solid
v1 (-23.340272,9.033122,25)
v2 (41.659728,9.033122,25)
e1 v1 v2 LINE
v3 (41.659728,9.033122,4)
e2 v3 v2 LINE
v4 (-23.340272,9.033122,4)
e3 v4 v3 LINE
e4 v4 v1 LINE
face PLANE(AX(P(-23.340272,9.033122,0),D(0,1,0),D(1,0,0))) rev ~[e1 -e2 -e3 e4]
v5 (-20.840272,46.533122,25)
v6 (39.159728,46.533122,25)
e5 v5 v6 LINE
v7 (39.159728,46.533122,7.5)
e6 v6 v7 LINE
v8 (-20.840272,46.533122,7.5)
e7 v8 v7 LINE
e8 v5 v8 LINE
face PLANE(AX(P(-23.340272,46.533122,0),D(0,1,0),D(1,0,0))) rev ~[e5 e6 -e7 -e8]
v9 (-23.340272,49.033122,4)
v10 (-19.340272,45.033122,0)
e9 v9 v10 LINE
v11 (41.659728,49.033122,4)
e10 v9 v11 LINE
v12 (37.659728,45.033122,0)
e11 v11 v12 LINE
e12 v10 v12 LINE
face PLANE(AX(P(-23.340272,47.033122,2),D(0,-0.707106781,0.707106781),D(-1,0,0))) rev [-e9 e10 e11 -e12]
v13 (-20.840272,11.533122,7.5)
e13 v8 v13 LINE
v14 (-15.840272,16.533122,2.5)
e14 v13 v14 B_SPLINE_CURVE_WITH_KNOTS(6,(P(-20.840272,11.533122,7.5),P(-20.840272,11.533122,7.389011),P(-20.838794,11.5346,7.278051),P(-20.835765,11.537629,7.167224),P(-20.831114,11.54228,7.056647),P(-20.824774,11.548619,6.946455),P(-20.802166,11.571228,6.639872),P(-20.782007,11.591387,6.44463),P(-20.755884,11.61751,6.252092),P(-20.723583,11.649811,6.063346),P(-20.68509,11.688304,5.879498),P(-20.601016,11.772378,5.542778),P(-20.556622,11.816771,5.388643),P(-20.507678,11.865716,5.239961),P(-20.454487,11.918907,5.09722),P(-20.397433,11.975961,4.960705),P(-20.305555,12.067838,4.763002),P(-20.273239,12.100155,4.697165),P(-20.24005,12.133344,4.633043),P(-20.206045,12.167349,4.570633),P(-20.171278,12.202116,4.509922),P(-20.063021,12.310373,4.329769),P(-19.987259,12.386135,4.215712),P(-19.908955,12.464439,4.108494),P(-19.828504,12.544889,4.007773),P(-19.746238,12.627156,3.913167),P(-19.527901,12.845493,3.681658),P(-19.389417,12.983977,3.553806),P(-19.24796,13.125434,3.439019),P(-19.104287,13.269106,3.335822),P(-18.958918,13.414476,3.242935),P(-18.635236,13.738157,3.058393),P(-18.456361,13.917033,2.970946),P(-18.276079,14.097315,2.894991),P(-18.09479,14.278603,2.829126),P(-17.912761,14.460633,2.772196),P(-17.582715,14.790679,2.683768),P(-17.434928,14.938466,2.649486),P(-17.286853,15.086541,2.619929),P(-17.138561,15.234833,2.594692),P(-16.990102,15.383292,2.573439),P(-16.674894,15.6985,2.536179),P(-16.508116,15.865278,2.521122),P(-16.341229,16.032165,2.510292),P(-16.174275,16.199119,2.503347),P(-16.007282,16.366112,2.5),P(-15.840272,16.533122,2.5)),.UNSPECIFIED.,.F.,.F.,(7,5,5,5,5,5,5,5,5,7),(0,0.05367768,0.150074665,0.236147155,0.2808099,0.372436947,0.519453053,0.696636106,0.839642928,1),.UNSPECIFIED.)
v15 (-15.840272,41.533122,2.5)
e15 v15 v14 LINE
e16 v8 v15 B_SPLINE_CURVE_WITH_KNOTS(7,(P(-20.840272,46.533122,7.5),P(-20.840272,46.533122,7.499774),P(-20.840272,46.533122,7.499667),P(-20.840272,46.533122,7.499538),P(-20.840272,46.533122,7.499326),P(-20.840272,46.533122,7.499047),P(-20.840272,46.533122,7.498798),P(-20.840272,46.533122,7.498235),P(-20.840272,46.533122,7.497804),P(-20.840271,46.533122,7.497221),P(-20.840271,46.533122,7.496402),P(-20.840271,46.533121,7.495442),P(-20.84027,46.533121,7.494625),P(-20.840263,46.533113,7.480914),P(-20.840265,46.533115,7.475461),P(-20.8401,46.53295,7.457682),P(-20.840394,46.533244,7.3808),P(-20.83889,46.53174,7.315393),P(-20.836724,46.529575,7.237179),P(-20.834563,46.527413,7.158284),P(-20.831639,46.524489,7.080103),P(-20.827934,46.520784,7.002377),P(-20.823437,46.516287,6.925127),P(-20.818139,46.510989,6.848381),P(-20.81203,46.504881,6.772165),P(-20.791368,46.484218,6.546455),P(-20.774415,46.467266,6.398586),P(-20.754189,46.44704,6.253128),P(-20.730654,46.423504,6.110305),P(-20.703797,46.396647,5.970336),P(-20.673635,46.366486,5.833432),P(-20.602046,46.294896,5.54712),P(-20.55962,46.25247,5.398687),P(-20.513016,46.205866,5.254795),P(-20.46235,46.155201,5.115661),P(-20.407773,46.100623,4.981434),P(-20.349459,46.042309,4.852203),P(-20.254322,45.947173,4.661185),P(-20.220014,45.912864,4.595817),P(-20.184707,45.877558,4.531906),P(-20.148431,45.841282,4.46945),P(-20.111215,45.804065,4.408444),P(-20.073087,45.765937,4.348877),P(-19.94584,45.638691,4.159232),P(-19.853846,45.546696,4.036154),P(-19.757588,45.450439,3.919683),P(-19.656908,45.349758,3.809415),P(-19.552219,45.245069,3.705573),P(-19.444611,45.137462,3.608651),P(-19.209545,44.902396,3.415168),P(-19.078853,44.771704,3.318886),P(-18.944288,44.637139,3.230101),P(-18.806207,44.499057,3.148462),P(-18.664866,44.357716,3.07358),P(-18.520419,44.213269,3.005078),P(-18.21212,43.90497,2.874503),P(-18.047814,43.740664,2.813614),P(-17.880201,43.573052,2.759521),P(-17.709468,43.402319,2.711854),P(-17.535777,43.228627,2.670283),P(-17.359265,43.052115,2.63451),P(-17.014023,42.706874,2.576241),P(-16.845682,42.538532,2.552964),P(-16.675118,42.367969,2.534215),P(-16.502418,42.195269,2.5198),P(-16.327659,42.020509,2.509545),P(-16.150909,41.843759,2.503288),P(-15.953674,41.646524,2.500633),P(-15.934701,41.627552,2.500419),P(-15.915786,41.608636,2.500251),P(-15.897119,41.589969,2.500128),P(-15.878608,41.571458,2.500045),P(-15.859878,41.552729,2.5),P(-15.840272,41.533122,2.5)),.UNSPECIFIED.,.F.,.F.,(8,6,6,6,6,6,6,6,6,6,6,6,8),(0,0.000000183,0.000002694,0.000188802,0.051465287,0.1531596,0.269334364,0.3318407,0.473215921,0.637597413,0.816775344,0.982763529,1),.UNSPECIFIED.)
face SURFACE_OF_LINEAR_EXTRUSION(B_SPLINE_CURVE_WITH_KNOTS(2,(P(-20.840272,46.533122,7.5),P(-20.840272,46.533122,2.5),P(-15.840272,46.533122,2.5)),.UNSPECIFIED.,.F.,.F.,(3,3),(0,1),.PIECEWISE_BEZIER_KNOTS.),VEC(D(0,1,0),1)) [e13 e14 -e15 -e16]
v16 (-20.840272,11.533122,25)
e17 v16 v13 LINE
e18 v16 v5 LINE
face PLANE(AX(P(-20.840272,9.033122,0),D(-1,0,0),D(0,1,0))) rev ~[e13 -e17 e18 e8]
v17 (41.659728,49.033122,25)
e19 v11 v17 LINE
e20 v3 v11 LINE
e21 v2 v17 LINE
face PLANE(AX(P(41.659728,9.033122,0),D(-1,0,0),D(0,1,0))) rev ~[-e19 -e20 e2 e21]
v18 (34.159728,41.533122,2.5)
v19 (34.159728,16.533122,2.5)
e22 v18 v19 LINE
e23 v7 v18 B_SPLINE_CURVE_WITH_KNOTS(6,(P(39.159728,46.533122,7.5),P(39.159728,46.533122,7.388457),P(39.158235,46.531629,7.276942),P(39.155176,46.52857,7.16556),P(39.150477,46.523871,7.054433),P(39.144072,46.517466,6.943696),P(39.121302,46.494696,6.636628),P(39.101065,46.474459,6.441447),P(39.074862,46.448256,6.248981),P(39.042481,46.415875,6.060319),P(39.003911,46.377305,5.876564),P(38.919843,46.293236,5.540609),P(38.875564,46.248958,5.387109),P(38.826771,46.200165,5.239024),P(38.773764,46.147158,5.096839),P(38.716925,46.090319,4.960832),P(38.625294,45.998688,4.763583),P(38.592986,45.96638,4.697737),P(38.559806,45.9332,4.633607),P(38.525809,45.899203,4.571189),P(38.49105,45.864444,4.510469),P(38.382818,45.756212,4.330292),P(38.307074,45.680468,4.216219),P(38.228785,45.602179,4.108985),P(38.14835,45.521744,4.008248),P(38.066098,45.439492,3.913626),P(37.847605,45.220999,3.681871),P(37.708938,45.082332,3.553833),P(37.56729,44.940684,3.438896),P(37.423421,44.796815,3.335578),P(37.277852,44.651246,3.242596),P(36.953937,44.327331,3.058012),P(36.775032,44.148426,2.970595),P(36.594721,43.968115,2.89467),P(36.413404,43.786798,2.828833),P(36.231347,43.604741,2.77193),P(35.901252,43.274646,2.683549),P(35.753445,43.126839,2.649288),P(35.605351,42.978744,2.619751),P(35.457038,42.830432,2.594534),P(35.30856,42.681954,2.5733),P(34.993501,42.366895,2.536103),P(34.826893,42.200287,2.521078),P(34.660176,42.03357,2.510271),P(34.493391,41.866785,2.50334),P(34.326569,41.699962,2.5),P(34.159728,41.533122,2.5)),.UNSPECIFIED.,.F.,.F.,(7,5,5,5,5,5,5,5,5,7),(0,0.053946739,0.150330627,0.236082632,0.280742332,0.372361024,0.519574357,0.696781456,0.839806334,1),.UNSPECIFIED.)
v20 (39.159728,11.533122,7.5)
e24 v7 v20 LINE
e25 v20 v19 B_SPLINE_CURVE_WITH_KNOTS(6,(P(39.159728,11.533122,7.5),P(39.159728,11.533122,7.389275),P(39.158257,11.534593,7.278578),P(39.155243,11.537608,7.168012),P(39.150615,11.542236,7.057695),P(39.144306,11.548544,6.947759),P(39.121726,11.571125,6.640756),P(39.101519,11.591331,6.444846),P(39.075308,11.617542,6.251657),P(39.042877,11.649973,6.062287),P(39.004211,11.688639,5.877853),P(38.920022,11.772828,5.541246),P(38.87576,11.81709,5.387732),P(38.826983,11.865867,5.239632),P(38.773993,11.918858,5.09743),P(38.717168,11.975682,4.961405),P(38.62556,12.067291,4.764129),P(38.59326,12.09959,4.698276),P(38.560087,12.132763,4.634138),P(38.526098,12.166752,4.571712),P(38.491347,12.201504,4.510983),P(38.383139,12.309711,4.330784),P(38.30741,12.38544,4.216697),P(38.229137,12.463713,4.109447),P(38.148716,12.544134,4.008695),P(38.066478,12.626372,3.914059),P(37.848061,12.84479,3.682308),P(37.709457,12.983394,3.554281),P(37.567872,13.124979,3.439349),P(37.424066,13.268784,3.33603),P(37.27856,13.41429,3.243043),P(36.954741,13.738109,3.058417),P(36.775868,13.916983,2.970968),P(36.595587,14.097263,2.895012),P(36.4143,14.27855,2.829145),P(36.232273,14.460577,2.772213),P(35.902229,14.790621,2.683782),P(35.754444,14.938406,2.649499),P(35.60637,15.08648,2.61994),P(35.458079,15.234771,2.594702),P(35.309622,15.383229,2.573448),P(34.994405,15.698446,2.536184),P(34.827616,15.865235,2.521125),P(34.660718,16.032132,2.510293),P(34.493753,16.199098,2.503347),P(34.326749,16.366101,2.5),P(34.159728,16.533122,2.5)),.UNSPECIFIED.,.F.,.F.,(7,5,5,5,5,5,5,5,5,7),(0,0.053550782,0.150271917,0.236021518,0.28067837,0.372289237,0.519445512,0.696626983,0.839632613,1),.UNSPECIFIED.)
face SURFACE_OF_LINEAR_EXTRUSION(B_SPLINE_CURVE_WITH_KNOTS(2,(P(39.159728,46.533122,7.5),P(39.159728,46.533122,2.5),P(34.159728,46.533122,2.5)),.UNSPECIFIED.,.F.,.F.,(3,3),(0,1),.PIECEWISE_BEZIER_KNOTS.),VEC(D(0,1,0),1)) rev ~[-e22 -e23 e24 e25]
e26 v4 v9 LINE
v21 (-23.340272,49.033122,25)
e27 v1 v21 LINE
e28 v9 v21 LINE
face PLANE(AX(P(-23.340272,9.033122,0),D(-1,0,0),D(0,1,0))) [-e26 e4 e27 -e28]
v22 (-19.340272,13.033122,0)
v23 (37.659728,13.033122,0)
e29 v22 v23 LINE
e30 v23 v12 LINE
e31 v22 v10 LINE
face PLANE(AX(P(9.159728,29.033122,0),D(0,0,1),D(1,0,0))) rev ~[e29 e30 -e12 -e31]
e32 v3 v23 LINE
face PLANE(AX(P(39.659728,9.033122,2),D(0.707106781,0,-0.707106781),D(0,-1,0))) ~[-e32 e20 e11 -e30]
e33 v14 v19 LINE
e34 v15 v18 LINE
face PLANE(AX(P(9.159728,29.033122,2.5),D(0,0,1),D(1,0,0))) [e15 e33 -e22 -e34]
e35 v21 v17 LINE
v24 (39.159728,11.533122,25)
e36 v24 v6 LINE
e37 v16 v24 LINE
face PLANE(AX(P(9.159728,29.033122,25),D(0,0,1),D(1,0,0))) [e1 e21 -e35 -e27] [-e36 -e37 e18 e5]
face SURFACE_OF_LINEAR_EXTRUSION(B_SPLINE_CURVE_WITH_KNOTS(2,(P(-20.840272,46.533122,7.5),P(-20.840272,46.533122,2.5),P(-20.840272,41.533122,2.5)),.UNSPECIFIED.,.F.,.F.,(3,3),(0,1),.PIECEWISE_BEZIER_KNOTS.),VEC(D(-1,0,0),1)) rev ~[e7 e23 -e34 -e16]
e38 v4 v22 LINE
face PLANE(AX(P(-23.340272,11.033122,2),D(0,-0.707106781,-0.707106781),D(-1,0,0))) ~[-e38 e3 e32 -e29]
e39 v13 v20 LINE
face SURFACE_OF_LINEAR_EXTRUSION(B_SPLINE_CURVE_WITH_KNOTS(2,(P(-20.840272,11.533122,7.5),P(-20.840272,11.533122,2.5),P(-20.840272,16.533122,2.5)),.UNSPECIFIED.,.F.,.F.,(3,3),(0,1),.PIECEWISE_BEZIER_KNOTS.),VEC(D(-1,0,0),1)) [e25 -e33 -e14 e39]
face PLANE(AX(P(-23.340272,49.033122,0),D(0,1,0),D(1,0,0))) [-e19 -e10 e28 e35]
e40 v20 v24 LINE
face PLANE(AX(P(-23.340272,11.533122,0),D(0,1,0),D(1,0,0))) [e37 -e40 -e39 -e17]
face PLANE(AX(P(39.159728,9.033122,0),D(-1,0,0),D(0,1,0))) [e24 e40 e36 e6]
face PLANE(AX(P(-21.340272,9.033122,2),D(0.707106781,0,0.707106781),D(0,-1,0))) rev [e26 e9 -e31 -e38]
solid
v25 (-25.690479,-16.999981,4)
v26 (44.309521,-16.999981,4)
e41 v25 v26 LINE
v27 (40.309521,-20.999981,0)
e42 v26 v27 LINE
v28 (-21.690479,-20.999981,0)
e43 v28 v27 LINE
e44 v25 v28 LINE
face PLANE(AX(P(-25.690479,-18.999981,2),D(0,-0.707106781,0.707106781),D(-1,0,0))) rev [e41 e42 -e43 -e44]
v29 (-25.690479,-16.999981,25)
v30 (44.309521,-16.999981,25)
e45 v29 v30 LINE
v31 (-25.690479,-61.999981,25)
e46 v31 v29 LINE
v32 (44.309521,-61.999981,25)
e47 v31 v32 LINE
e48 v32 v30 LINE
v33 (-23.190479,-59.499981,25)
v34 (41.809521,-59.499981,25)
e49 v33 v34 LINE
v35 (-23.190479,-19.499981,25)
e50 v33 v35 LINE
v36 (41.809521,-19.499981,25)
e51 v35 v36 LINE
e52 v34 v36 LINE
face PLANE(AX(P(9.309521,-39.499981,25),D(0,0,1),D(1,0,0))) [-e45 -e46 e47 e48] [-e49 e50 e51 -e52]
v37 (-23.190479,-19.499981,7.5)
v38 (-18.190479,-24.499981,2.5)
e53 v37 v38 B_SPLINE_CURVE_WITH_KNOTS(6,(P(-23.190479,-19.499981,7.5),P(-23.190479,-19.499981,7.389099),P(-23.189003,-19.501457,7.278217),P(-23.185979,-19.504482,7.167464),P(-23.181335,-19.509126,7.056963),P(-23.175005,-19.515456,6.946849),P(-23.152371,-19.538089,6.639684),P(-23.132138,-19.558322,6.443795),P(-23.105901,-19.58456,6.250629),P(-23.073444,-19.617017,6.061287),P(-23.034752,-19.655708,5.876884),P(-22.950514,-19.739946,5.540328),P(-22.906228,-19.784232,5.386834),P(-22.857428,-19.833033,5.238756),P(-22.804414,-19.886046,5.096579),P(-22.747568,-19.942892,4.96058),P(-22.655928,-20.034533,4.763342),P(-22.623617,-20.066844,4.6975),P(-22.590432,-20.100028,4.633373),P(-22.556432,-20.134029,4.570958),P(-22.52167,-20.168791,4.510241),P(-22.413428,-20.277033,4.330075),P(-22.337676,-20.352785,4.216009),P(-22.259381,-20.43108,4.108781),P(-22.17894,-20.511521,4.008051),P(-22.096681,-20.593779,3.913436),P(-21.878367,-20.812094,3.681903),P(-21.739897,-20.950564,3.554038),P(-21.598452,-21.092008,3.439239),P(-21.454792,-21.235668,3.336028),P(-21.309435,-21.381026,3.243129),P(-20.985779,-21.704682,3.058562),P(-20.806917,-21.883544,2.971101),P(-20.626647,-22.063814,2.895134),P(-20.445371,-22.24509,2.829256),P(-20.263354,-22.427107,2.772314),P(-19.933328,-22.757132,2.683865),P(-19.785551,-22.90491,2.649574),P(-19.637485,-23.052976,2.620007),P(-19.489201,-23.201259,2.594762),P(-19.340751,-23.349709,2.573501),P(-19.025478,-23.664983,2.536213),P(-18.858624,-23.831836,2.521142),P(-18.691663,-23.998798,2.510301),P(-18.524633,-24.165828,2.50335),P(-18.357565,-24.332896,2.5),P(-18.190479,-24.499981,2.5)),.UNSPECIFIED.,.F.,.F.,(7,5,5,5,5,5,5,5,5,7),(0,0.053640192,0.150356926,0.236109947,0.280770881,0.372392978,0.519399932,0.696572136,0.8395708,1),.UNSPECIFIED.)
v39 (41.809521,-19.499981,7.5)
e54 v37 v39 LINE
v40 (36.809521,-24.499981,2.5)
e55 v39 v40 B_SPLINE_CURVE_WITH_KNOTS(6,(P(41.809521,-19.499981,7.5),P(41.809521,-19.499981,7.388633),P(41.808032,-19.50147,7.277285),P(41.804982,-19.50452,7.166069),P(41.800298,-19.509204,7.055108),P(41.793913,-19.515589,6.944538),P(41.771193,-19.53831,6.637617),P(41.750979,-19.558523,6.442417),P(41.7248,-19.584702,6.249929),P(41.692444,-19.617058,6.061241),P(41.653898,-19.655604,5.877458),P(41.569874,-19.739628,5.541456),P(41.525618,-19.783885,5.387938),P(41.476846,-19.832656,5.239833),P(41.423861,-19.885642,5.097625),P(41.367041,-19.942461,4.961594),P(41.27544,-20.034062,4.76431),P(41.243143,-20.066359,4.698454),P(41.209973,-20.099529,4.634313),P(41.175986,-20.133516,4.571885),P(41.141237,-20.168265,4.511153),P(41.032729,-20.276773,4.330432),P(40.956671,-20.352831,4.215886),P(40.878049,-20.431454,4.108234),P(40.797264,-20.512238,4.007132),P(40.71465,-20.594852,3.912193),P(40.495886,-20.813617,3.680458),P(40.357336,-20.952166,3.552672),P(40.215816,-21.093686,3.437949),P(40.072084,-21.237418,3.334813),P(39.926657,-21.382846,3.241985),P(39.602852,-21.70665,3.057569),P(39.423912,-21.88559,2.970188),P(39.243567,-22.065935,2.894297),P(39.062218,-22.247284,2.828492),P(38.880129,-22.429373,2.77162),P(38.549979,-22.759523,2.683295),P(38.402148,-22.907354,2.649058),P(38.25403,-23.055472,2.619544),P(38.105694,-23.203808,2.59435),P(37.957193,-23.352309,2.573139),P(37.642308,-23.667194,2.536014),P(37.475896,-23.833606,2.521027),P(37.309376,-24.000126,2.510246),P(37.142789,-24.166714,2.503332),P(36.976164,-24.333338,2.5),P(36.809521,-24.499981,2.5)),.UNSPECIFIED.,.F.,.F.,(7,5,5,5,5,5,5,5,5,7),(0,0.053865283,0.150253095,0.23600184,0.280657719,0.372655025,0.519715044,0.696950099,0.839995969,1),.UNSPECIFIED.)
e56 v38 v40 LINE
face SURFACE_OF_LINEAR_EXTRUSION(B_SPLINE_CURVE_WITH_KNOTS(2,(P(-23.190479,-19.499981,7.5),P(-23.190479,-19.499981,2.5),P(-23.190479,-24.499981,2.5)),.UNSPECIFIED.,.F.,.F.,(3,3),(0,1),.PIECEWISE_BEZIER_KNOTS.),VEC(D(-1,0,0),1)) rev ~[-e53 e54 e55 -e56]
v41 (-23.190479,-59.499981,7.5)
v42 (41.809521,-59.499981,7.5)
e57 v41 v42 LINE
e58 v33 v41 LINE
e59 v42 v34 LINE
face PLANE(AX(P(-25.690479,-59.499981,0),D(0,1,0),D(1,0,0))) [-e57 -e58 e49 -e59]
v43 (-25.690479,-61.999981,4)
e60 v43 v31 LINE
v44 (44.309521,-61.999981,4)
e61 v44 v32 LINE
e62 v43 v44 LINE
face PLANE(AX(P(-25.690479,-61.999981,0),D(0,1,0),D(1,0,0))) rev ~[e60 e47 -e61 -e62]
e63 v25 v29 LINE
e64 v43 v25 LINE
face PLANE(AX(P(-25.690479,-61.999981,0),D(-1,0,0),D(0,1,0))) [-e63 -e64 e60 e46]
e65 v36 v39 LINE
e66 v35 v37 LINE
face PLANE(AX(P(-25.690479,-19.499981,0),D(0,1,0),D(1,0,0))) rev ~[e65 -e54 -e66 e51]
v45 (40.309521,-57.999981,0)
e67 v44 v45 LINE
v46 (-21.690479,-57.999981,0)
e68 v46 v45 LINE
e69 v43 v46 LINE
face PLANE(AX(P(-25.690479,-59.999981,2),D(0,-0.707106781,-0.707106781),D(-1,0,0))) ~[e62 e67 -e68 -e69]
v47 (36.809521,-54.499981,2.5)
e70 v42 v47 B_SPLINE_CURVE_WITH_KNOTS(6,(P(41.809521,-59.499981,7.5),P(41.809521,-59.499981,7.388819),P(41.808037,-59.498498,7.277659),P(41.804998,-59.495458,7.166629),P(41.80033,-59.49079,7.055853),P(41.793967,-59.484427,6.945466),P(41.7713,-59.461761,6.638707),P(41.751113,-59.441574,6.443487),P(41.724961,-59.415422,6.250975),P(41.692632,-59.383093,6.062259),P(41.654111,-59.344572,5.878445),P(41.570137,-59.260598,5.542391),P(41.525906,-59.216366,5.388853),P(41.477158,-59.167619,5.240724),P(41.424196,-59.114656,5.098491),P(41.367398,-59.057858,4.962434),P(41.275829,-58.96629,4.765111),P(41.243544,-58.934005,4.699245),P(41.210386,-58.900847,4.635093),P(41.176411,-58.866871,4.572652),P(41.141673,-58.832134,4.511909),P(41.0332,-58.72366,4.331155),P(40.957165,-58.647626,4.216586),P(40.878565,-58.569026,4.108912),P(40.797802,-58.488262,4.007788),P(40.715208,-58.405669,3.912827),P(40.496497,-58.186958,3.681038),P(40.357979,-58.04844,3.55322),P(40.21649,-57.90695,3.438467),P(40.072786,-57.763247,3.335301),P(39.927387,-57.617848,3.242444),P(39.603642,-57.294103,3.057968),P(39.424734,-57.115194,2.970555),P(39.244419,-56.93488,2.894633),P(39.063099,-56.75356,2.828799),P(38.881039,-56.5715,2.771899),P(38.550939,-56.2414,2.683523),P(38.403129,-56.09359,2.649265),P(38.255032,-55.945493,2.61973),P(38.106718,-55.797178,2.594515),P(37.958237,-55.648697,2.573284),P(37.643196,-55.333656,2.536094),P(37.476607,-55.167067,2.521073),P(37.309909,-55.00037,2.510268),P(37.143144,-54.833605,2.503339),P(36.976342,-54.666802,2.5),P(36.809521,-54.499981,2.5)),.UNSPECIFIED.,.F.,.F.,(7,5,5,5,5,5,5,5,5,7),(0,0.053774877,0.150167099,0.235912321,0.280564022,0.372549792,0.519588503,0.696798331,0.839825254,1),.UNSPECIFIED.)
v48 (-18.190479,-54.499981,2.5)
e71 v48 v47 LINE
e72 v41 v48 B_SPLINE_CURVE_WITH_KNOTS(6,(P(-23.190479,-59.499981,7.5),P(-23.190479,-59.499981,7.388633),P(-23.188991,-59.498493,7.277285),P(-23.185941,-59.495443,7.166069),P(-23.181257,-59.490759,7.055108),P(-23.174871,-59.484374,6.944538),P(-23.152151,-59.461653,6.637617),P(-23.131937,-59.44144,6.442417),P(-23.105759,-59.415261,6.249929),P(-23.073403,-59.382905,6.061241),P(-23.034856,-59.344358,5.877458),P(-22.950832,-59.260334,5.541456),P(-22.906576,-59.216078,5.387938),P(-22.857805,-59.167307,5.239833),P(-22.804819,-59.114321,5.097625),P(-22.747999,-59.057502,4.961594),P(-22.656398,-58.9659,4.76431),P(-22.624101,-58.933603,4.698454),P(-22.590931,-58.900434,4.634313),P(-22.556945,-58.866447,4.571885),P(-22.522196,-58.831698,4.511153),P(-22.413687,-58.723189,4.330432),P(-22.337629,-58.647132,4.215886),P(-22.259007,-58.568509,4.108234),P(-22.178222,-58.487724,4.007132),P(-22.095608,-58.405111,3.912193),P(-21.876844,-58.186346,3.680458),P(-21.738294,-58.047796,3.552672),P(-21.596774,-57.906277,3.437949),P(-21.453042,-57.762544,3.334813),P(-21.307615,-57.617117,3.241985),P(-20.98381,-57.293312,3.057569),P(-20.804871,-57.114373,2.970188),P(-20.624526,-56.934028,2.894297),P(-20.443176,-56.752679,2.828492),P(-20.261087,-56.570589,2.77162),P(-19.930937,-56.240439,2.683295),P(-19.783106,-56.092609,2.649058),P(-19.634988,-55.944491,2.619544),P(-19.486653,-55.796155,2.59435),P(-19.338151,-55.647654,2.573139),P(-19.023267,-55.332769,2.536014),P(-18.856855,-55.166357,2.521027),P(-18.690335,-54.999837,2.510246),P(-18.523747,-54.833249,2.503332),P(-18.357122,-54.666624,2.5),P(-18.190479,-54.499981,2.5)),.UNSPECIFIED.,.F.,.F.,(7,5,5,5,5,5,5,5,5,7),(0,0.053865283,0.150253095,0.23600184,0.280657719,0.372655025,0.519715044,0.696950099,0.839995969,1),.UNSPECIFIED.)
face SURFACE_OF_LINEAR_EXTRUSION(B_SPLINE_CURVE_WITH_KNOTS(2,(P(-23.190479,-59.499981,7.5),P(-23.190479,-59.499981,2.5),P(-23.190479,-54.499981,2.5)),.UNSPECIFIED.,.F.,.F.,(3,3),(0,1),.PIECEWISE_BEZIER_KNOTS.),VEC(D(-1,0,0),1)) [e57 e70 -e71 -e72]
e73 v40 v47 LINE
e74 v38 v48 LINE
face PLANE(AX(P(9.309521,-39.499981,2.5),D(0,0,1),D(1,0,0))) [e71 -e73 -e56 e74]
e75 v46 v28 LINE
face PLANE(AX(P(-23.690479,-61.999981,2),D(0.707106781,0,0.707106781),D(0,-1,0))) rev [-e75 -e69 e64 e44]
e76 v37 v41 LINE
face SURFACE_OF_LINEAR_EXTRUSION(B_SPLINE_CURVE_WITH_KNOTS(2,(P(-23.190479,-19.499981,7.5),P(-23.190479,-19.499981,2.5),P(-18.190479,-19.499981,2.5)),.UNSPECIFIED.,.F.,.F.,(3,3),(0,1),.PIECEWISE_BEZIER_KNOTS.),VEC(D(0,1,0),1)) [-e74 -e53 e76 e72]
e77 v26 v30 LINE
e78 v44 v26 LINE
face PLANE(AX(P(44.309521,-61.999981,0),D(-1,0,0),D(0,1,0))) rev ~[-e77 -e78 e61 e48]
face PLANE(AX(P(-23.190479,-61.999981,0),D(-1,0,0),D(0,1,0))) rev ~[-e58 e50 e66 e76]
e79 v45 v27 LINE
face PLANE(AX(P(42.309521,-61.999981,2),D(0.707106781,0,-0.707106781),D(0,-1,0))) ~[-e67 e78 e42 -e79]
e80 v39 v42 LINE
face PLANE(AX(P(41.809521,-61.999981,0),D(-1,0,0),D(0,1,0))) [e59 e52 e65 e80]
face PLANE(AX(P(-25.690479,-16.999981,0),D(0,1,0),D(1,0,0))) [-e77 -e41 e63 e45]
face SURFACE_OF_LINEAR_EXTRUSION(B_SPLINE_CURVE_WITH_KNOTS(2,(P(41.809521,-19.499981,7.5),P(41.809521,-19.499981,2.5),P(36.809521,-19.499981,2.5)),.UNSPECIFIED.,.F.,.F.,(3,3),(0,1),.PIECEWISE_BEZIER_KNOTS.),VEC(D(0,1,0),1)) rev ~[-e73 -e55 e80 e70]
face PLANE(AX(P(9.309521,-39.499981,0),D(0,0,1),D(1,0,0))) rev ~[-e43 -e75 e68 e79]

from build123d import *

# Parameters (mm, degrees)
F0_W        = 70
F0_H        = 45
F1_DEPTH    = 25
F2_T        = -2.5
F3_T1_DEPTH = 40
F3_T3_DEPTH = 65
F4_SIZE     = 4
F5_W        = 65
F5_H        = 40
F6_DEPTH    = 25
F7_T        = -2.5
F8_T1_DEPTH = 35
F8_T3_DEPTH = 60
F9_SIZE     = 4


# Not quite as in the source:
# - a fillet or chamfer that OpenCascade refuses, or shapes differently, is made with other operations: its cross-section is extruded or revolved along the edge and cut away or added


with BuildPart() as f1:
    # F0 (on Top) → F1 (new body)
    with BuildSketch(Plane.XY):
        with Locations((9.3095207959, -39.4999814034)):
            Rectangle(F0_W, F0_H)
    extrude(amount=F1_DEPTH)

    # F2
    f2_openings = [f1.faces().sort_by_distance(p)[0] for p in [
        (9.309521, -39.499981, 25),
    ]]
    offset(amount=F2_T, openings=f2_openings)

    # F3: fillet of radius 5 on 4 edges, made by hand

    # F3_s2 → F3_t1 (join)
    with BuildSketch(Plane.XZ.offset(19.4999814034)):
        with BuildLine():
            add(Edge.make_bspline(
                [(-23.1904792041, 7.5), (-23.1904792041, 2.5), (-18.1904792041, 2.5)],
                knots=[0, 0, 0, 1, 1, 1], degree=2, weights=[1, 1, 1]))
            Line((-18.1904792041, 2.5), (-23.1904792041, 2.5))
            Line((-23.1904792041, 2.5), (-23.1904792041, 7.5))
        make_face()
        with BuildLine():
            add(Edge.make_bspline(
                [(41.8095207959, 7.5), (41.8095207959, 2.5), (36.8095207959, 2.5)],
                knots=[0, 0, 0, 1, 1, 1], degree=2, weights=[1, 1, 1]))
            Line((36.8095207959, 2.5), (41.8095207959, 2.5))
            Line((41.8095207959, 2.5), (41.8095207959, 7.5))
        make_face()
    extrude(amount=F3_T1_DEPTH)

    # F3_s4 → F3_t3 (join)
    with BuildSketch(Plane.YZ.offset(-23.1904792041)):
        with BuildLine():
            add(Edge.make_bspline(
                [(-19.4999814034, 7.5), (-19.4999814034, 2.5), (-24.4999814034, 2.5)],
                knots=[0, 0, 0, 1, 1, 1], degree=2, weights=[1, 1, 1]))
            Line((-24.4999814034, 2.5), (-19.4999814034, 2.5))
            Line((-19.4999814034, 2.5), (-19.4999814034, 7.5))
        make_face()
        with BuildLine():
            add(Edge.make_bspline(
                [(-59.4999814034, 7.5), (-59.4999814034, 2.5), (-54.4999814034, 2.5)],
                knots=[0, 0, 0, 1, 1, 1], degree=2, weights=[1, 1, 1]))
            Line((-54.4999814034, 2.5), (-59.4999814034, 2.5))
            Line((-59.4999814034, 2.5), (-59.4999814034, 7.5))
        make_face()
    extrude(amount=F3_T3_DEPTH)

    # F4
    f4_edges = [f1.edges().sort_by_distance(p)[0] for p in [
        (9.309521, -61.999981, 0),
        (-25.690479, -39.499981, 0),
        (44.309521, -39.499981, 0),
        (9.309521, -16.999981, 0),
    ]]
    chamfer(f4_edges, length=F4_SIZE)


with BuildPart() as f6:
    # F5 (on Top) → F6 (new body)
    with BuildSketch(Plane.XY):
        with Locations((9.1597282141, 29.0331220999)):
            Rectangle(F5_W, F5_H)
    extrude(amount=F6_DEPTH)

    # F7
    f7_openings = [f6.faces().sort_by_distance(p)[0] for p in [
        (9.159728, 29.033122, 25),
    ]]
    offset(amount=F7_T, openings=f7_openings)

    # F8: fillet of radius 5 on 4 edges, made by hand

    # F8_s2 → F8_t1 (join)
    with BuildSketch(Plane.XZ.offset(-46.5331220999)):
        with BuildLine():
            add(Edge.make_bspline(
                [(-20.8402717859, 7.5), (-20.8402717859, 2.5), (-15.8402717859, 2.5)],
                knots=[0, 0, 0, 1, 1, 1], degree=2, weights=[1, 1, 1]))
            Line((-15.8402717859, 2.5), (-20.8402717859, 2.5))
            Line((-20.8402717859, 2.5), (-20.8402717859, 7.5))
        make_face()
        with BuildLine():
            add(Edge.make_bspline(
                [(39.1597282141, 7.5), (39.1597282141, 2.5), (34.1597282141, 2.5)],
                knots=[0, 0, 0, 1, 1, 1], degree=2, weights=[1, 1, 1]))
            Line((34.1597282141, 2.5), (39.1597282141, 2.5))
            Line((39.1597282141, 2.5), (39.1597282141, 7.5))
        make_face()
    extrude(amount=F8_T1_DEPTH)

    # F8_s4 → F8_t3 (join)
    with BuildSketch(Plane.YZ.offset(-20.8402717859)):
        with BuildLine():
            add(Edge.make_bspline(
                [(11.5331220999, 7.5), (11.5331220999, 2.5), (16.5331220999, 2.5)],
                knots=[0, 0, 0, 1, 1, 1], degree=2, weights=[1, 1, 1]))
            Line((16.5331220999, 2.5), (11.5331220999, 2.5))
            Line((11.5331220999, 2.5), (11.5331220999, 7.5))
        make_face()
        with BuildLine():
            add(Edge.make_bspline(
                [(46.5331220999, 7.5), (46.5331220999, 2.5), (41.5331220999, 2.5)],
                knots=[0, 0, 0, 1, 1, 1], degree=2, weights=[1, 1, 1]))
            Line((41.5331220999, 2.5), (46.5331220999, 2.5))
            Line((46.5331220999, 2.5), (46.5331220999, 7.5))
        make_face()
    extrude(amount=F8_T3_DEPTH)

    # F9
    f9_edges = [f6.edges().sort_by_distance(p)[0] for p in [
        (9.159728, 9.033122, 0),
        (-23.340272, 29.033122, 0),
        (9.159728, 49.033122, 0),
        (41.659728, 29.033122, 0),
    ]]
    chamfer(f9_edges, length=F9_SIZE)


solid = Compound([f1.part, f6.part])
